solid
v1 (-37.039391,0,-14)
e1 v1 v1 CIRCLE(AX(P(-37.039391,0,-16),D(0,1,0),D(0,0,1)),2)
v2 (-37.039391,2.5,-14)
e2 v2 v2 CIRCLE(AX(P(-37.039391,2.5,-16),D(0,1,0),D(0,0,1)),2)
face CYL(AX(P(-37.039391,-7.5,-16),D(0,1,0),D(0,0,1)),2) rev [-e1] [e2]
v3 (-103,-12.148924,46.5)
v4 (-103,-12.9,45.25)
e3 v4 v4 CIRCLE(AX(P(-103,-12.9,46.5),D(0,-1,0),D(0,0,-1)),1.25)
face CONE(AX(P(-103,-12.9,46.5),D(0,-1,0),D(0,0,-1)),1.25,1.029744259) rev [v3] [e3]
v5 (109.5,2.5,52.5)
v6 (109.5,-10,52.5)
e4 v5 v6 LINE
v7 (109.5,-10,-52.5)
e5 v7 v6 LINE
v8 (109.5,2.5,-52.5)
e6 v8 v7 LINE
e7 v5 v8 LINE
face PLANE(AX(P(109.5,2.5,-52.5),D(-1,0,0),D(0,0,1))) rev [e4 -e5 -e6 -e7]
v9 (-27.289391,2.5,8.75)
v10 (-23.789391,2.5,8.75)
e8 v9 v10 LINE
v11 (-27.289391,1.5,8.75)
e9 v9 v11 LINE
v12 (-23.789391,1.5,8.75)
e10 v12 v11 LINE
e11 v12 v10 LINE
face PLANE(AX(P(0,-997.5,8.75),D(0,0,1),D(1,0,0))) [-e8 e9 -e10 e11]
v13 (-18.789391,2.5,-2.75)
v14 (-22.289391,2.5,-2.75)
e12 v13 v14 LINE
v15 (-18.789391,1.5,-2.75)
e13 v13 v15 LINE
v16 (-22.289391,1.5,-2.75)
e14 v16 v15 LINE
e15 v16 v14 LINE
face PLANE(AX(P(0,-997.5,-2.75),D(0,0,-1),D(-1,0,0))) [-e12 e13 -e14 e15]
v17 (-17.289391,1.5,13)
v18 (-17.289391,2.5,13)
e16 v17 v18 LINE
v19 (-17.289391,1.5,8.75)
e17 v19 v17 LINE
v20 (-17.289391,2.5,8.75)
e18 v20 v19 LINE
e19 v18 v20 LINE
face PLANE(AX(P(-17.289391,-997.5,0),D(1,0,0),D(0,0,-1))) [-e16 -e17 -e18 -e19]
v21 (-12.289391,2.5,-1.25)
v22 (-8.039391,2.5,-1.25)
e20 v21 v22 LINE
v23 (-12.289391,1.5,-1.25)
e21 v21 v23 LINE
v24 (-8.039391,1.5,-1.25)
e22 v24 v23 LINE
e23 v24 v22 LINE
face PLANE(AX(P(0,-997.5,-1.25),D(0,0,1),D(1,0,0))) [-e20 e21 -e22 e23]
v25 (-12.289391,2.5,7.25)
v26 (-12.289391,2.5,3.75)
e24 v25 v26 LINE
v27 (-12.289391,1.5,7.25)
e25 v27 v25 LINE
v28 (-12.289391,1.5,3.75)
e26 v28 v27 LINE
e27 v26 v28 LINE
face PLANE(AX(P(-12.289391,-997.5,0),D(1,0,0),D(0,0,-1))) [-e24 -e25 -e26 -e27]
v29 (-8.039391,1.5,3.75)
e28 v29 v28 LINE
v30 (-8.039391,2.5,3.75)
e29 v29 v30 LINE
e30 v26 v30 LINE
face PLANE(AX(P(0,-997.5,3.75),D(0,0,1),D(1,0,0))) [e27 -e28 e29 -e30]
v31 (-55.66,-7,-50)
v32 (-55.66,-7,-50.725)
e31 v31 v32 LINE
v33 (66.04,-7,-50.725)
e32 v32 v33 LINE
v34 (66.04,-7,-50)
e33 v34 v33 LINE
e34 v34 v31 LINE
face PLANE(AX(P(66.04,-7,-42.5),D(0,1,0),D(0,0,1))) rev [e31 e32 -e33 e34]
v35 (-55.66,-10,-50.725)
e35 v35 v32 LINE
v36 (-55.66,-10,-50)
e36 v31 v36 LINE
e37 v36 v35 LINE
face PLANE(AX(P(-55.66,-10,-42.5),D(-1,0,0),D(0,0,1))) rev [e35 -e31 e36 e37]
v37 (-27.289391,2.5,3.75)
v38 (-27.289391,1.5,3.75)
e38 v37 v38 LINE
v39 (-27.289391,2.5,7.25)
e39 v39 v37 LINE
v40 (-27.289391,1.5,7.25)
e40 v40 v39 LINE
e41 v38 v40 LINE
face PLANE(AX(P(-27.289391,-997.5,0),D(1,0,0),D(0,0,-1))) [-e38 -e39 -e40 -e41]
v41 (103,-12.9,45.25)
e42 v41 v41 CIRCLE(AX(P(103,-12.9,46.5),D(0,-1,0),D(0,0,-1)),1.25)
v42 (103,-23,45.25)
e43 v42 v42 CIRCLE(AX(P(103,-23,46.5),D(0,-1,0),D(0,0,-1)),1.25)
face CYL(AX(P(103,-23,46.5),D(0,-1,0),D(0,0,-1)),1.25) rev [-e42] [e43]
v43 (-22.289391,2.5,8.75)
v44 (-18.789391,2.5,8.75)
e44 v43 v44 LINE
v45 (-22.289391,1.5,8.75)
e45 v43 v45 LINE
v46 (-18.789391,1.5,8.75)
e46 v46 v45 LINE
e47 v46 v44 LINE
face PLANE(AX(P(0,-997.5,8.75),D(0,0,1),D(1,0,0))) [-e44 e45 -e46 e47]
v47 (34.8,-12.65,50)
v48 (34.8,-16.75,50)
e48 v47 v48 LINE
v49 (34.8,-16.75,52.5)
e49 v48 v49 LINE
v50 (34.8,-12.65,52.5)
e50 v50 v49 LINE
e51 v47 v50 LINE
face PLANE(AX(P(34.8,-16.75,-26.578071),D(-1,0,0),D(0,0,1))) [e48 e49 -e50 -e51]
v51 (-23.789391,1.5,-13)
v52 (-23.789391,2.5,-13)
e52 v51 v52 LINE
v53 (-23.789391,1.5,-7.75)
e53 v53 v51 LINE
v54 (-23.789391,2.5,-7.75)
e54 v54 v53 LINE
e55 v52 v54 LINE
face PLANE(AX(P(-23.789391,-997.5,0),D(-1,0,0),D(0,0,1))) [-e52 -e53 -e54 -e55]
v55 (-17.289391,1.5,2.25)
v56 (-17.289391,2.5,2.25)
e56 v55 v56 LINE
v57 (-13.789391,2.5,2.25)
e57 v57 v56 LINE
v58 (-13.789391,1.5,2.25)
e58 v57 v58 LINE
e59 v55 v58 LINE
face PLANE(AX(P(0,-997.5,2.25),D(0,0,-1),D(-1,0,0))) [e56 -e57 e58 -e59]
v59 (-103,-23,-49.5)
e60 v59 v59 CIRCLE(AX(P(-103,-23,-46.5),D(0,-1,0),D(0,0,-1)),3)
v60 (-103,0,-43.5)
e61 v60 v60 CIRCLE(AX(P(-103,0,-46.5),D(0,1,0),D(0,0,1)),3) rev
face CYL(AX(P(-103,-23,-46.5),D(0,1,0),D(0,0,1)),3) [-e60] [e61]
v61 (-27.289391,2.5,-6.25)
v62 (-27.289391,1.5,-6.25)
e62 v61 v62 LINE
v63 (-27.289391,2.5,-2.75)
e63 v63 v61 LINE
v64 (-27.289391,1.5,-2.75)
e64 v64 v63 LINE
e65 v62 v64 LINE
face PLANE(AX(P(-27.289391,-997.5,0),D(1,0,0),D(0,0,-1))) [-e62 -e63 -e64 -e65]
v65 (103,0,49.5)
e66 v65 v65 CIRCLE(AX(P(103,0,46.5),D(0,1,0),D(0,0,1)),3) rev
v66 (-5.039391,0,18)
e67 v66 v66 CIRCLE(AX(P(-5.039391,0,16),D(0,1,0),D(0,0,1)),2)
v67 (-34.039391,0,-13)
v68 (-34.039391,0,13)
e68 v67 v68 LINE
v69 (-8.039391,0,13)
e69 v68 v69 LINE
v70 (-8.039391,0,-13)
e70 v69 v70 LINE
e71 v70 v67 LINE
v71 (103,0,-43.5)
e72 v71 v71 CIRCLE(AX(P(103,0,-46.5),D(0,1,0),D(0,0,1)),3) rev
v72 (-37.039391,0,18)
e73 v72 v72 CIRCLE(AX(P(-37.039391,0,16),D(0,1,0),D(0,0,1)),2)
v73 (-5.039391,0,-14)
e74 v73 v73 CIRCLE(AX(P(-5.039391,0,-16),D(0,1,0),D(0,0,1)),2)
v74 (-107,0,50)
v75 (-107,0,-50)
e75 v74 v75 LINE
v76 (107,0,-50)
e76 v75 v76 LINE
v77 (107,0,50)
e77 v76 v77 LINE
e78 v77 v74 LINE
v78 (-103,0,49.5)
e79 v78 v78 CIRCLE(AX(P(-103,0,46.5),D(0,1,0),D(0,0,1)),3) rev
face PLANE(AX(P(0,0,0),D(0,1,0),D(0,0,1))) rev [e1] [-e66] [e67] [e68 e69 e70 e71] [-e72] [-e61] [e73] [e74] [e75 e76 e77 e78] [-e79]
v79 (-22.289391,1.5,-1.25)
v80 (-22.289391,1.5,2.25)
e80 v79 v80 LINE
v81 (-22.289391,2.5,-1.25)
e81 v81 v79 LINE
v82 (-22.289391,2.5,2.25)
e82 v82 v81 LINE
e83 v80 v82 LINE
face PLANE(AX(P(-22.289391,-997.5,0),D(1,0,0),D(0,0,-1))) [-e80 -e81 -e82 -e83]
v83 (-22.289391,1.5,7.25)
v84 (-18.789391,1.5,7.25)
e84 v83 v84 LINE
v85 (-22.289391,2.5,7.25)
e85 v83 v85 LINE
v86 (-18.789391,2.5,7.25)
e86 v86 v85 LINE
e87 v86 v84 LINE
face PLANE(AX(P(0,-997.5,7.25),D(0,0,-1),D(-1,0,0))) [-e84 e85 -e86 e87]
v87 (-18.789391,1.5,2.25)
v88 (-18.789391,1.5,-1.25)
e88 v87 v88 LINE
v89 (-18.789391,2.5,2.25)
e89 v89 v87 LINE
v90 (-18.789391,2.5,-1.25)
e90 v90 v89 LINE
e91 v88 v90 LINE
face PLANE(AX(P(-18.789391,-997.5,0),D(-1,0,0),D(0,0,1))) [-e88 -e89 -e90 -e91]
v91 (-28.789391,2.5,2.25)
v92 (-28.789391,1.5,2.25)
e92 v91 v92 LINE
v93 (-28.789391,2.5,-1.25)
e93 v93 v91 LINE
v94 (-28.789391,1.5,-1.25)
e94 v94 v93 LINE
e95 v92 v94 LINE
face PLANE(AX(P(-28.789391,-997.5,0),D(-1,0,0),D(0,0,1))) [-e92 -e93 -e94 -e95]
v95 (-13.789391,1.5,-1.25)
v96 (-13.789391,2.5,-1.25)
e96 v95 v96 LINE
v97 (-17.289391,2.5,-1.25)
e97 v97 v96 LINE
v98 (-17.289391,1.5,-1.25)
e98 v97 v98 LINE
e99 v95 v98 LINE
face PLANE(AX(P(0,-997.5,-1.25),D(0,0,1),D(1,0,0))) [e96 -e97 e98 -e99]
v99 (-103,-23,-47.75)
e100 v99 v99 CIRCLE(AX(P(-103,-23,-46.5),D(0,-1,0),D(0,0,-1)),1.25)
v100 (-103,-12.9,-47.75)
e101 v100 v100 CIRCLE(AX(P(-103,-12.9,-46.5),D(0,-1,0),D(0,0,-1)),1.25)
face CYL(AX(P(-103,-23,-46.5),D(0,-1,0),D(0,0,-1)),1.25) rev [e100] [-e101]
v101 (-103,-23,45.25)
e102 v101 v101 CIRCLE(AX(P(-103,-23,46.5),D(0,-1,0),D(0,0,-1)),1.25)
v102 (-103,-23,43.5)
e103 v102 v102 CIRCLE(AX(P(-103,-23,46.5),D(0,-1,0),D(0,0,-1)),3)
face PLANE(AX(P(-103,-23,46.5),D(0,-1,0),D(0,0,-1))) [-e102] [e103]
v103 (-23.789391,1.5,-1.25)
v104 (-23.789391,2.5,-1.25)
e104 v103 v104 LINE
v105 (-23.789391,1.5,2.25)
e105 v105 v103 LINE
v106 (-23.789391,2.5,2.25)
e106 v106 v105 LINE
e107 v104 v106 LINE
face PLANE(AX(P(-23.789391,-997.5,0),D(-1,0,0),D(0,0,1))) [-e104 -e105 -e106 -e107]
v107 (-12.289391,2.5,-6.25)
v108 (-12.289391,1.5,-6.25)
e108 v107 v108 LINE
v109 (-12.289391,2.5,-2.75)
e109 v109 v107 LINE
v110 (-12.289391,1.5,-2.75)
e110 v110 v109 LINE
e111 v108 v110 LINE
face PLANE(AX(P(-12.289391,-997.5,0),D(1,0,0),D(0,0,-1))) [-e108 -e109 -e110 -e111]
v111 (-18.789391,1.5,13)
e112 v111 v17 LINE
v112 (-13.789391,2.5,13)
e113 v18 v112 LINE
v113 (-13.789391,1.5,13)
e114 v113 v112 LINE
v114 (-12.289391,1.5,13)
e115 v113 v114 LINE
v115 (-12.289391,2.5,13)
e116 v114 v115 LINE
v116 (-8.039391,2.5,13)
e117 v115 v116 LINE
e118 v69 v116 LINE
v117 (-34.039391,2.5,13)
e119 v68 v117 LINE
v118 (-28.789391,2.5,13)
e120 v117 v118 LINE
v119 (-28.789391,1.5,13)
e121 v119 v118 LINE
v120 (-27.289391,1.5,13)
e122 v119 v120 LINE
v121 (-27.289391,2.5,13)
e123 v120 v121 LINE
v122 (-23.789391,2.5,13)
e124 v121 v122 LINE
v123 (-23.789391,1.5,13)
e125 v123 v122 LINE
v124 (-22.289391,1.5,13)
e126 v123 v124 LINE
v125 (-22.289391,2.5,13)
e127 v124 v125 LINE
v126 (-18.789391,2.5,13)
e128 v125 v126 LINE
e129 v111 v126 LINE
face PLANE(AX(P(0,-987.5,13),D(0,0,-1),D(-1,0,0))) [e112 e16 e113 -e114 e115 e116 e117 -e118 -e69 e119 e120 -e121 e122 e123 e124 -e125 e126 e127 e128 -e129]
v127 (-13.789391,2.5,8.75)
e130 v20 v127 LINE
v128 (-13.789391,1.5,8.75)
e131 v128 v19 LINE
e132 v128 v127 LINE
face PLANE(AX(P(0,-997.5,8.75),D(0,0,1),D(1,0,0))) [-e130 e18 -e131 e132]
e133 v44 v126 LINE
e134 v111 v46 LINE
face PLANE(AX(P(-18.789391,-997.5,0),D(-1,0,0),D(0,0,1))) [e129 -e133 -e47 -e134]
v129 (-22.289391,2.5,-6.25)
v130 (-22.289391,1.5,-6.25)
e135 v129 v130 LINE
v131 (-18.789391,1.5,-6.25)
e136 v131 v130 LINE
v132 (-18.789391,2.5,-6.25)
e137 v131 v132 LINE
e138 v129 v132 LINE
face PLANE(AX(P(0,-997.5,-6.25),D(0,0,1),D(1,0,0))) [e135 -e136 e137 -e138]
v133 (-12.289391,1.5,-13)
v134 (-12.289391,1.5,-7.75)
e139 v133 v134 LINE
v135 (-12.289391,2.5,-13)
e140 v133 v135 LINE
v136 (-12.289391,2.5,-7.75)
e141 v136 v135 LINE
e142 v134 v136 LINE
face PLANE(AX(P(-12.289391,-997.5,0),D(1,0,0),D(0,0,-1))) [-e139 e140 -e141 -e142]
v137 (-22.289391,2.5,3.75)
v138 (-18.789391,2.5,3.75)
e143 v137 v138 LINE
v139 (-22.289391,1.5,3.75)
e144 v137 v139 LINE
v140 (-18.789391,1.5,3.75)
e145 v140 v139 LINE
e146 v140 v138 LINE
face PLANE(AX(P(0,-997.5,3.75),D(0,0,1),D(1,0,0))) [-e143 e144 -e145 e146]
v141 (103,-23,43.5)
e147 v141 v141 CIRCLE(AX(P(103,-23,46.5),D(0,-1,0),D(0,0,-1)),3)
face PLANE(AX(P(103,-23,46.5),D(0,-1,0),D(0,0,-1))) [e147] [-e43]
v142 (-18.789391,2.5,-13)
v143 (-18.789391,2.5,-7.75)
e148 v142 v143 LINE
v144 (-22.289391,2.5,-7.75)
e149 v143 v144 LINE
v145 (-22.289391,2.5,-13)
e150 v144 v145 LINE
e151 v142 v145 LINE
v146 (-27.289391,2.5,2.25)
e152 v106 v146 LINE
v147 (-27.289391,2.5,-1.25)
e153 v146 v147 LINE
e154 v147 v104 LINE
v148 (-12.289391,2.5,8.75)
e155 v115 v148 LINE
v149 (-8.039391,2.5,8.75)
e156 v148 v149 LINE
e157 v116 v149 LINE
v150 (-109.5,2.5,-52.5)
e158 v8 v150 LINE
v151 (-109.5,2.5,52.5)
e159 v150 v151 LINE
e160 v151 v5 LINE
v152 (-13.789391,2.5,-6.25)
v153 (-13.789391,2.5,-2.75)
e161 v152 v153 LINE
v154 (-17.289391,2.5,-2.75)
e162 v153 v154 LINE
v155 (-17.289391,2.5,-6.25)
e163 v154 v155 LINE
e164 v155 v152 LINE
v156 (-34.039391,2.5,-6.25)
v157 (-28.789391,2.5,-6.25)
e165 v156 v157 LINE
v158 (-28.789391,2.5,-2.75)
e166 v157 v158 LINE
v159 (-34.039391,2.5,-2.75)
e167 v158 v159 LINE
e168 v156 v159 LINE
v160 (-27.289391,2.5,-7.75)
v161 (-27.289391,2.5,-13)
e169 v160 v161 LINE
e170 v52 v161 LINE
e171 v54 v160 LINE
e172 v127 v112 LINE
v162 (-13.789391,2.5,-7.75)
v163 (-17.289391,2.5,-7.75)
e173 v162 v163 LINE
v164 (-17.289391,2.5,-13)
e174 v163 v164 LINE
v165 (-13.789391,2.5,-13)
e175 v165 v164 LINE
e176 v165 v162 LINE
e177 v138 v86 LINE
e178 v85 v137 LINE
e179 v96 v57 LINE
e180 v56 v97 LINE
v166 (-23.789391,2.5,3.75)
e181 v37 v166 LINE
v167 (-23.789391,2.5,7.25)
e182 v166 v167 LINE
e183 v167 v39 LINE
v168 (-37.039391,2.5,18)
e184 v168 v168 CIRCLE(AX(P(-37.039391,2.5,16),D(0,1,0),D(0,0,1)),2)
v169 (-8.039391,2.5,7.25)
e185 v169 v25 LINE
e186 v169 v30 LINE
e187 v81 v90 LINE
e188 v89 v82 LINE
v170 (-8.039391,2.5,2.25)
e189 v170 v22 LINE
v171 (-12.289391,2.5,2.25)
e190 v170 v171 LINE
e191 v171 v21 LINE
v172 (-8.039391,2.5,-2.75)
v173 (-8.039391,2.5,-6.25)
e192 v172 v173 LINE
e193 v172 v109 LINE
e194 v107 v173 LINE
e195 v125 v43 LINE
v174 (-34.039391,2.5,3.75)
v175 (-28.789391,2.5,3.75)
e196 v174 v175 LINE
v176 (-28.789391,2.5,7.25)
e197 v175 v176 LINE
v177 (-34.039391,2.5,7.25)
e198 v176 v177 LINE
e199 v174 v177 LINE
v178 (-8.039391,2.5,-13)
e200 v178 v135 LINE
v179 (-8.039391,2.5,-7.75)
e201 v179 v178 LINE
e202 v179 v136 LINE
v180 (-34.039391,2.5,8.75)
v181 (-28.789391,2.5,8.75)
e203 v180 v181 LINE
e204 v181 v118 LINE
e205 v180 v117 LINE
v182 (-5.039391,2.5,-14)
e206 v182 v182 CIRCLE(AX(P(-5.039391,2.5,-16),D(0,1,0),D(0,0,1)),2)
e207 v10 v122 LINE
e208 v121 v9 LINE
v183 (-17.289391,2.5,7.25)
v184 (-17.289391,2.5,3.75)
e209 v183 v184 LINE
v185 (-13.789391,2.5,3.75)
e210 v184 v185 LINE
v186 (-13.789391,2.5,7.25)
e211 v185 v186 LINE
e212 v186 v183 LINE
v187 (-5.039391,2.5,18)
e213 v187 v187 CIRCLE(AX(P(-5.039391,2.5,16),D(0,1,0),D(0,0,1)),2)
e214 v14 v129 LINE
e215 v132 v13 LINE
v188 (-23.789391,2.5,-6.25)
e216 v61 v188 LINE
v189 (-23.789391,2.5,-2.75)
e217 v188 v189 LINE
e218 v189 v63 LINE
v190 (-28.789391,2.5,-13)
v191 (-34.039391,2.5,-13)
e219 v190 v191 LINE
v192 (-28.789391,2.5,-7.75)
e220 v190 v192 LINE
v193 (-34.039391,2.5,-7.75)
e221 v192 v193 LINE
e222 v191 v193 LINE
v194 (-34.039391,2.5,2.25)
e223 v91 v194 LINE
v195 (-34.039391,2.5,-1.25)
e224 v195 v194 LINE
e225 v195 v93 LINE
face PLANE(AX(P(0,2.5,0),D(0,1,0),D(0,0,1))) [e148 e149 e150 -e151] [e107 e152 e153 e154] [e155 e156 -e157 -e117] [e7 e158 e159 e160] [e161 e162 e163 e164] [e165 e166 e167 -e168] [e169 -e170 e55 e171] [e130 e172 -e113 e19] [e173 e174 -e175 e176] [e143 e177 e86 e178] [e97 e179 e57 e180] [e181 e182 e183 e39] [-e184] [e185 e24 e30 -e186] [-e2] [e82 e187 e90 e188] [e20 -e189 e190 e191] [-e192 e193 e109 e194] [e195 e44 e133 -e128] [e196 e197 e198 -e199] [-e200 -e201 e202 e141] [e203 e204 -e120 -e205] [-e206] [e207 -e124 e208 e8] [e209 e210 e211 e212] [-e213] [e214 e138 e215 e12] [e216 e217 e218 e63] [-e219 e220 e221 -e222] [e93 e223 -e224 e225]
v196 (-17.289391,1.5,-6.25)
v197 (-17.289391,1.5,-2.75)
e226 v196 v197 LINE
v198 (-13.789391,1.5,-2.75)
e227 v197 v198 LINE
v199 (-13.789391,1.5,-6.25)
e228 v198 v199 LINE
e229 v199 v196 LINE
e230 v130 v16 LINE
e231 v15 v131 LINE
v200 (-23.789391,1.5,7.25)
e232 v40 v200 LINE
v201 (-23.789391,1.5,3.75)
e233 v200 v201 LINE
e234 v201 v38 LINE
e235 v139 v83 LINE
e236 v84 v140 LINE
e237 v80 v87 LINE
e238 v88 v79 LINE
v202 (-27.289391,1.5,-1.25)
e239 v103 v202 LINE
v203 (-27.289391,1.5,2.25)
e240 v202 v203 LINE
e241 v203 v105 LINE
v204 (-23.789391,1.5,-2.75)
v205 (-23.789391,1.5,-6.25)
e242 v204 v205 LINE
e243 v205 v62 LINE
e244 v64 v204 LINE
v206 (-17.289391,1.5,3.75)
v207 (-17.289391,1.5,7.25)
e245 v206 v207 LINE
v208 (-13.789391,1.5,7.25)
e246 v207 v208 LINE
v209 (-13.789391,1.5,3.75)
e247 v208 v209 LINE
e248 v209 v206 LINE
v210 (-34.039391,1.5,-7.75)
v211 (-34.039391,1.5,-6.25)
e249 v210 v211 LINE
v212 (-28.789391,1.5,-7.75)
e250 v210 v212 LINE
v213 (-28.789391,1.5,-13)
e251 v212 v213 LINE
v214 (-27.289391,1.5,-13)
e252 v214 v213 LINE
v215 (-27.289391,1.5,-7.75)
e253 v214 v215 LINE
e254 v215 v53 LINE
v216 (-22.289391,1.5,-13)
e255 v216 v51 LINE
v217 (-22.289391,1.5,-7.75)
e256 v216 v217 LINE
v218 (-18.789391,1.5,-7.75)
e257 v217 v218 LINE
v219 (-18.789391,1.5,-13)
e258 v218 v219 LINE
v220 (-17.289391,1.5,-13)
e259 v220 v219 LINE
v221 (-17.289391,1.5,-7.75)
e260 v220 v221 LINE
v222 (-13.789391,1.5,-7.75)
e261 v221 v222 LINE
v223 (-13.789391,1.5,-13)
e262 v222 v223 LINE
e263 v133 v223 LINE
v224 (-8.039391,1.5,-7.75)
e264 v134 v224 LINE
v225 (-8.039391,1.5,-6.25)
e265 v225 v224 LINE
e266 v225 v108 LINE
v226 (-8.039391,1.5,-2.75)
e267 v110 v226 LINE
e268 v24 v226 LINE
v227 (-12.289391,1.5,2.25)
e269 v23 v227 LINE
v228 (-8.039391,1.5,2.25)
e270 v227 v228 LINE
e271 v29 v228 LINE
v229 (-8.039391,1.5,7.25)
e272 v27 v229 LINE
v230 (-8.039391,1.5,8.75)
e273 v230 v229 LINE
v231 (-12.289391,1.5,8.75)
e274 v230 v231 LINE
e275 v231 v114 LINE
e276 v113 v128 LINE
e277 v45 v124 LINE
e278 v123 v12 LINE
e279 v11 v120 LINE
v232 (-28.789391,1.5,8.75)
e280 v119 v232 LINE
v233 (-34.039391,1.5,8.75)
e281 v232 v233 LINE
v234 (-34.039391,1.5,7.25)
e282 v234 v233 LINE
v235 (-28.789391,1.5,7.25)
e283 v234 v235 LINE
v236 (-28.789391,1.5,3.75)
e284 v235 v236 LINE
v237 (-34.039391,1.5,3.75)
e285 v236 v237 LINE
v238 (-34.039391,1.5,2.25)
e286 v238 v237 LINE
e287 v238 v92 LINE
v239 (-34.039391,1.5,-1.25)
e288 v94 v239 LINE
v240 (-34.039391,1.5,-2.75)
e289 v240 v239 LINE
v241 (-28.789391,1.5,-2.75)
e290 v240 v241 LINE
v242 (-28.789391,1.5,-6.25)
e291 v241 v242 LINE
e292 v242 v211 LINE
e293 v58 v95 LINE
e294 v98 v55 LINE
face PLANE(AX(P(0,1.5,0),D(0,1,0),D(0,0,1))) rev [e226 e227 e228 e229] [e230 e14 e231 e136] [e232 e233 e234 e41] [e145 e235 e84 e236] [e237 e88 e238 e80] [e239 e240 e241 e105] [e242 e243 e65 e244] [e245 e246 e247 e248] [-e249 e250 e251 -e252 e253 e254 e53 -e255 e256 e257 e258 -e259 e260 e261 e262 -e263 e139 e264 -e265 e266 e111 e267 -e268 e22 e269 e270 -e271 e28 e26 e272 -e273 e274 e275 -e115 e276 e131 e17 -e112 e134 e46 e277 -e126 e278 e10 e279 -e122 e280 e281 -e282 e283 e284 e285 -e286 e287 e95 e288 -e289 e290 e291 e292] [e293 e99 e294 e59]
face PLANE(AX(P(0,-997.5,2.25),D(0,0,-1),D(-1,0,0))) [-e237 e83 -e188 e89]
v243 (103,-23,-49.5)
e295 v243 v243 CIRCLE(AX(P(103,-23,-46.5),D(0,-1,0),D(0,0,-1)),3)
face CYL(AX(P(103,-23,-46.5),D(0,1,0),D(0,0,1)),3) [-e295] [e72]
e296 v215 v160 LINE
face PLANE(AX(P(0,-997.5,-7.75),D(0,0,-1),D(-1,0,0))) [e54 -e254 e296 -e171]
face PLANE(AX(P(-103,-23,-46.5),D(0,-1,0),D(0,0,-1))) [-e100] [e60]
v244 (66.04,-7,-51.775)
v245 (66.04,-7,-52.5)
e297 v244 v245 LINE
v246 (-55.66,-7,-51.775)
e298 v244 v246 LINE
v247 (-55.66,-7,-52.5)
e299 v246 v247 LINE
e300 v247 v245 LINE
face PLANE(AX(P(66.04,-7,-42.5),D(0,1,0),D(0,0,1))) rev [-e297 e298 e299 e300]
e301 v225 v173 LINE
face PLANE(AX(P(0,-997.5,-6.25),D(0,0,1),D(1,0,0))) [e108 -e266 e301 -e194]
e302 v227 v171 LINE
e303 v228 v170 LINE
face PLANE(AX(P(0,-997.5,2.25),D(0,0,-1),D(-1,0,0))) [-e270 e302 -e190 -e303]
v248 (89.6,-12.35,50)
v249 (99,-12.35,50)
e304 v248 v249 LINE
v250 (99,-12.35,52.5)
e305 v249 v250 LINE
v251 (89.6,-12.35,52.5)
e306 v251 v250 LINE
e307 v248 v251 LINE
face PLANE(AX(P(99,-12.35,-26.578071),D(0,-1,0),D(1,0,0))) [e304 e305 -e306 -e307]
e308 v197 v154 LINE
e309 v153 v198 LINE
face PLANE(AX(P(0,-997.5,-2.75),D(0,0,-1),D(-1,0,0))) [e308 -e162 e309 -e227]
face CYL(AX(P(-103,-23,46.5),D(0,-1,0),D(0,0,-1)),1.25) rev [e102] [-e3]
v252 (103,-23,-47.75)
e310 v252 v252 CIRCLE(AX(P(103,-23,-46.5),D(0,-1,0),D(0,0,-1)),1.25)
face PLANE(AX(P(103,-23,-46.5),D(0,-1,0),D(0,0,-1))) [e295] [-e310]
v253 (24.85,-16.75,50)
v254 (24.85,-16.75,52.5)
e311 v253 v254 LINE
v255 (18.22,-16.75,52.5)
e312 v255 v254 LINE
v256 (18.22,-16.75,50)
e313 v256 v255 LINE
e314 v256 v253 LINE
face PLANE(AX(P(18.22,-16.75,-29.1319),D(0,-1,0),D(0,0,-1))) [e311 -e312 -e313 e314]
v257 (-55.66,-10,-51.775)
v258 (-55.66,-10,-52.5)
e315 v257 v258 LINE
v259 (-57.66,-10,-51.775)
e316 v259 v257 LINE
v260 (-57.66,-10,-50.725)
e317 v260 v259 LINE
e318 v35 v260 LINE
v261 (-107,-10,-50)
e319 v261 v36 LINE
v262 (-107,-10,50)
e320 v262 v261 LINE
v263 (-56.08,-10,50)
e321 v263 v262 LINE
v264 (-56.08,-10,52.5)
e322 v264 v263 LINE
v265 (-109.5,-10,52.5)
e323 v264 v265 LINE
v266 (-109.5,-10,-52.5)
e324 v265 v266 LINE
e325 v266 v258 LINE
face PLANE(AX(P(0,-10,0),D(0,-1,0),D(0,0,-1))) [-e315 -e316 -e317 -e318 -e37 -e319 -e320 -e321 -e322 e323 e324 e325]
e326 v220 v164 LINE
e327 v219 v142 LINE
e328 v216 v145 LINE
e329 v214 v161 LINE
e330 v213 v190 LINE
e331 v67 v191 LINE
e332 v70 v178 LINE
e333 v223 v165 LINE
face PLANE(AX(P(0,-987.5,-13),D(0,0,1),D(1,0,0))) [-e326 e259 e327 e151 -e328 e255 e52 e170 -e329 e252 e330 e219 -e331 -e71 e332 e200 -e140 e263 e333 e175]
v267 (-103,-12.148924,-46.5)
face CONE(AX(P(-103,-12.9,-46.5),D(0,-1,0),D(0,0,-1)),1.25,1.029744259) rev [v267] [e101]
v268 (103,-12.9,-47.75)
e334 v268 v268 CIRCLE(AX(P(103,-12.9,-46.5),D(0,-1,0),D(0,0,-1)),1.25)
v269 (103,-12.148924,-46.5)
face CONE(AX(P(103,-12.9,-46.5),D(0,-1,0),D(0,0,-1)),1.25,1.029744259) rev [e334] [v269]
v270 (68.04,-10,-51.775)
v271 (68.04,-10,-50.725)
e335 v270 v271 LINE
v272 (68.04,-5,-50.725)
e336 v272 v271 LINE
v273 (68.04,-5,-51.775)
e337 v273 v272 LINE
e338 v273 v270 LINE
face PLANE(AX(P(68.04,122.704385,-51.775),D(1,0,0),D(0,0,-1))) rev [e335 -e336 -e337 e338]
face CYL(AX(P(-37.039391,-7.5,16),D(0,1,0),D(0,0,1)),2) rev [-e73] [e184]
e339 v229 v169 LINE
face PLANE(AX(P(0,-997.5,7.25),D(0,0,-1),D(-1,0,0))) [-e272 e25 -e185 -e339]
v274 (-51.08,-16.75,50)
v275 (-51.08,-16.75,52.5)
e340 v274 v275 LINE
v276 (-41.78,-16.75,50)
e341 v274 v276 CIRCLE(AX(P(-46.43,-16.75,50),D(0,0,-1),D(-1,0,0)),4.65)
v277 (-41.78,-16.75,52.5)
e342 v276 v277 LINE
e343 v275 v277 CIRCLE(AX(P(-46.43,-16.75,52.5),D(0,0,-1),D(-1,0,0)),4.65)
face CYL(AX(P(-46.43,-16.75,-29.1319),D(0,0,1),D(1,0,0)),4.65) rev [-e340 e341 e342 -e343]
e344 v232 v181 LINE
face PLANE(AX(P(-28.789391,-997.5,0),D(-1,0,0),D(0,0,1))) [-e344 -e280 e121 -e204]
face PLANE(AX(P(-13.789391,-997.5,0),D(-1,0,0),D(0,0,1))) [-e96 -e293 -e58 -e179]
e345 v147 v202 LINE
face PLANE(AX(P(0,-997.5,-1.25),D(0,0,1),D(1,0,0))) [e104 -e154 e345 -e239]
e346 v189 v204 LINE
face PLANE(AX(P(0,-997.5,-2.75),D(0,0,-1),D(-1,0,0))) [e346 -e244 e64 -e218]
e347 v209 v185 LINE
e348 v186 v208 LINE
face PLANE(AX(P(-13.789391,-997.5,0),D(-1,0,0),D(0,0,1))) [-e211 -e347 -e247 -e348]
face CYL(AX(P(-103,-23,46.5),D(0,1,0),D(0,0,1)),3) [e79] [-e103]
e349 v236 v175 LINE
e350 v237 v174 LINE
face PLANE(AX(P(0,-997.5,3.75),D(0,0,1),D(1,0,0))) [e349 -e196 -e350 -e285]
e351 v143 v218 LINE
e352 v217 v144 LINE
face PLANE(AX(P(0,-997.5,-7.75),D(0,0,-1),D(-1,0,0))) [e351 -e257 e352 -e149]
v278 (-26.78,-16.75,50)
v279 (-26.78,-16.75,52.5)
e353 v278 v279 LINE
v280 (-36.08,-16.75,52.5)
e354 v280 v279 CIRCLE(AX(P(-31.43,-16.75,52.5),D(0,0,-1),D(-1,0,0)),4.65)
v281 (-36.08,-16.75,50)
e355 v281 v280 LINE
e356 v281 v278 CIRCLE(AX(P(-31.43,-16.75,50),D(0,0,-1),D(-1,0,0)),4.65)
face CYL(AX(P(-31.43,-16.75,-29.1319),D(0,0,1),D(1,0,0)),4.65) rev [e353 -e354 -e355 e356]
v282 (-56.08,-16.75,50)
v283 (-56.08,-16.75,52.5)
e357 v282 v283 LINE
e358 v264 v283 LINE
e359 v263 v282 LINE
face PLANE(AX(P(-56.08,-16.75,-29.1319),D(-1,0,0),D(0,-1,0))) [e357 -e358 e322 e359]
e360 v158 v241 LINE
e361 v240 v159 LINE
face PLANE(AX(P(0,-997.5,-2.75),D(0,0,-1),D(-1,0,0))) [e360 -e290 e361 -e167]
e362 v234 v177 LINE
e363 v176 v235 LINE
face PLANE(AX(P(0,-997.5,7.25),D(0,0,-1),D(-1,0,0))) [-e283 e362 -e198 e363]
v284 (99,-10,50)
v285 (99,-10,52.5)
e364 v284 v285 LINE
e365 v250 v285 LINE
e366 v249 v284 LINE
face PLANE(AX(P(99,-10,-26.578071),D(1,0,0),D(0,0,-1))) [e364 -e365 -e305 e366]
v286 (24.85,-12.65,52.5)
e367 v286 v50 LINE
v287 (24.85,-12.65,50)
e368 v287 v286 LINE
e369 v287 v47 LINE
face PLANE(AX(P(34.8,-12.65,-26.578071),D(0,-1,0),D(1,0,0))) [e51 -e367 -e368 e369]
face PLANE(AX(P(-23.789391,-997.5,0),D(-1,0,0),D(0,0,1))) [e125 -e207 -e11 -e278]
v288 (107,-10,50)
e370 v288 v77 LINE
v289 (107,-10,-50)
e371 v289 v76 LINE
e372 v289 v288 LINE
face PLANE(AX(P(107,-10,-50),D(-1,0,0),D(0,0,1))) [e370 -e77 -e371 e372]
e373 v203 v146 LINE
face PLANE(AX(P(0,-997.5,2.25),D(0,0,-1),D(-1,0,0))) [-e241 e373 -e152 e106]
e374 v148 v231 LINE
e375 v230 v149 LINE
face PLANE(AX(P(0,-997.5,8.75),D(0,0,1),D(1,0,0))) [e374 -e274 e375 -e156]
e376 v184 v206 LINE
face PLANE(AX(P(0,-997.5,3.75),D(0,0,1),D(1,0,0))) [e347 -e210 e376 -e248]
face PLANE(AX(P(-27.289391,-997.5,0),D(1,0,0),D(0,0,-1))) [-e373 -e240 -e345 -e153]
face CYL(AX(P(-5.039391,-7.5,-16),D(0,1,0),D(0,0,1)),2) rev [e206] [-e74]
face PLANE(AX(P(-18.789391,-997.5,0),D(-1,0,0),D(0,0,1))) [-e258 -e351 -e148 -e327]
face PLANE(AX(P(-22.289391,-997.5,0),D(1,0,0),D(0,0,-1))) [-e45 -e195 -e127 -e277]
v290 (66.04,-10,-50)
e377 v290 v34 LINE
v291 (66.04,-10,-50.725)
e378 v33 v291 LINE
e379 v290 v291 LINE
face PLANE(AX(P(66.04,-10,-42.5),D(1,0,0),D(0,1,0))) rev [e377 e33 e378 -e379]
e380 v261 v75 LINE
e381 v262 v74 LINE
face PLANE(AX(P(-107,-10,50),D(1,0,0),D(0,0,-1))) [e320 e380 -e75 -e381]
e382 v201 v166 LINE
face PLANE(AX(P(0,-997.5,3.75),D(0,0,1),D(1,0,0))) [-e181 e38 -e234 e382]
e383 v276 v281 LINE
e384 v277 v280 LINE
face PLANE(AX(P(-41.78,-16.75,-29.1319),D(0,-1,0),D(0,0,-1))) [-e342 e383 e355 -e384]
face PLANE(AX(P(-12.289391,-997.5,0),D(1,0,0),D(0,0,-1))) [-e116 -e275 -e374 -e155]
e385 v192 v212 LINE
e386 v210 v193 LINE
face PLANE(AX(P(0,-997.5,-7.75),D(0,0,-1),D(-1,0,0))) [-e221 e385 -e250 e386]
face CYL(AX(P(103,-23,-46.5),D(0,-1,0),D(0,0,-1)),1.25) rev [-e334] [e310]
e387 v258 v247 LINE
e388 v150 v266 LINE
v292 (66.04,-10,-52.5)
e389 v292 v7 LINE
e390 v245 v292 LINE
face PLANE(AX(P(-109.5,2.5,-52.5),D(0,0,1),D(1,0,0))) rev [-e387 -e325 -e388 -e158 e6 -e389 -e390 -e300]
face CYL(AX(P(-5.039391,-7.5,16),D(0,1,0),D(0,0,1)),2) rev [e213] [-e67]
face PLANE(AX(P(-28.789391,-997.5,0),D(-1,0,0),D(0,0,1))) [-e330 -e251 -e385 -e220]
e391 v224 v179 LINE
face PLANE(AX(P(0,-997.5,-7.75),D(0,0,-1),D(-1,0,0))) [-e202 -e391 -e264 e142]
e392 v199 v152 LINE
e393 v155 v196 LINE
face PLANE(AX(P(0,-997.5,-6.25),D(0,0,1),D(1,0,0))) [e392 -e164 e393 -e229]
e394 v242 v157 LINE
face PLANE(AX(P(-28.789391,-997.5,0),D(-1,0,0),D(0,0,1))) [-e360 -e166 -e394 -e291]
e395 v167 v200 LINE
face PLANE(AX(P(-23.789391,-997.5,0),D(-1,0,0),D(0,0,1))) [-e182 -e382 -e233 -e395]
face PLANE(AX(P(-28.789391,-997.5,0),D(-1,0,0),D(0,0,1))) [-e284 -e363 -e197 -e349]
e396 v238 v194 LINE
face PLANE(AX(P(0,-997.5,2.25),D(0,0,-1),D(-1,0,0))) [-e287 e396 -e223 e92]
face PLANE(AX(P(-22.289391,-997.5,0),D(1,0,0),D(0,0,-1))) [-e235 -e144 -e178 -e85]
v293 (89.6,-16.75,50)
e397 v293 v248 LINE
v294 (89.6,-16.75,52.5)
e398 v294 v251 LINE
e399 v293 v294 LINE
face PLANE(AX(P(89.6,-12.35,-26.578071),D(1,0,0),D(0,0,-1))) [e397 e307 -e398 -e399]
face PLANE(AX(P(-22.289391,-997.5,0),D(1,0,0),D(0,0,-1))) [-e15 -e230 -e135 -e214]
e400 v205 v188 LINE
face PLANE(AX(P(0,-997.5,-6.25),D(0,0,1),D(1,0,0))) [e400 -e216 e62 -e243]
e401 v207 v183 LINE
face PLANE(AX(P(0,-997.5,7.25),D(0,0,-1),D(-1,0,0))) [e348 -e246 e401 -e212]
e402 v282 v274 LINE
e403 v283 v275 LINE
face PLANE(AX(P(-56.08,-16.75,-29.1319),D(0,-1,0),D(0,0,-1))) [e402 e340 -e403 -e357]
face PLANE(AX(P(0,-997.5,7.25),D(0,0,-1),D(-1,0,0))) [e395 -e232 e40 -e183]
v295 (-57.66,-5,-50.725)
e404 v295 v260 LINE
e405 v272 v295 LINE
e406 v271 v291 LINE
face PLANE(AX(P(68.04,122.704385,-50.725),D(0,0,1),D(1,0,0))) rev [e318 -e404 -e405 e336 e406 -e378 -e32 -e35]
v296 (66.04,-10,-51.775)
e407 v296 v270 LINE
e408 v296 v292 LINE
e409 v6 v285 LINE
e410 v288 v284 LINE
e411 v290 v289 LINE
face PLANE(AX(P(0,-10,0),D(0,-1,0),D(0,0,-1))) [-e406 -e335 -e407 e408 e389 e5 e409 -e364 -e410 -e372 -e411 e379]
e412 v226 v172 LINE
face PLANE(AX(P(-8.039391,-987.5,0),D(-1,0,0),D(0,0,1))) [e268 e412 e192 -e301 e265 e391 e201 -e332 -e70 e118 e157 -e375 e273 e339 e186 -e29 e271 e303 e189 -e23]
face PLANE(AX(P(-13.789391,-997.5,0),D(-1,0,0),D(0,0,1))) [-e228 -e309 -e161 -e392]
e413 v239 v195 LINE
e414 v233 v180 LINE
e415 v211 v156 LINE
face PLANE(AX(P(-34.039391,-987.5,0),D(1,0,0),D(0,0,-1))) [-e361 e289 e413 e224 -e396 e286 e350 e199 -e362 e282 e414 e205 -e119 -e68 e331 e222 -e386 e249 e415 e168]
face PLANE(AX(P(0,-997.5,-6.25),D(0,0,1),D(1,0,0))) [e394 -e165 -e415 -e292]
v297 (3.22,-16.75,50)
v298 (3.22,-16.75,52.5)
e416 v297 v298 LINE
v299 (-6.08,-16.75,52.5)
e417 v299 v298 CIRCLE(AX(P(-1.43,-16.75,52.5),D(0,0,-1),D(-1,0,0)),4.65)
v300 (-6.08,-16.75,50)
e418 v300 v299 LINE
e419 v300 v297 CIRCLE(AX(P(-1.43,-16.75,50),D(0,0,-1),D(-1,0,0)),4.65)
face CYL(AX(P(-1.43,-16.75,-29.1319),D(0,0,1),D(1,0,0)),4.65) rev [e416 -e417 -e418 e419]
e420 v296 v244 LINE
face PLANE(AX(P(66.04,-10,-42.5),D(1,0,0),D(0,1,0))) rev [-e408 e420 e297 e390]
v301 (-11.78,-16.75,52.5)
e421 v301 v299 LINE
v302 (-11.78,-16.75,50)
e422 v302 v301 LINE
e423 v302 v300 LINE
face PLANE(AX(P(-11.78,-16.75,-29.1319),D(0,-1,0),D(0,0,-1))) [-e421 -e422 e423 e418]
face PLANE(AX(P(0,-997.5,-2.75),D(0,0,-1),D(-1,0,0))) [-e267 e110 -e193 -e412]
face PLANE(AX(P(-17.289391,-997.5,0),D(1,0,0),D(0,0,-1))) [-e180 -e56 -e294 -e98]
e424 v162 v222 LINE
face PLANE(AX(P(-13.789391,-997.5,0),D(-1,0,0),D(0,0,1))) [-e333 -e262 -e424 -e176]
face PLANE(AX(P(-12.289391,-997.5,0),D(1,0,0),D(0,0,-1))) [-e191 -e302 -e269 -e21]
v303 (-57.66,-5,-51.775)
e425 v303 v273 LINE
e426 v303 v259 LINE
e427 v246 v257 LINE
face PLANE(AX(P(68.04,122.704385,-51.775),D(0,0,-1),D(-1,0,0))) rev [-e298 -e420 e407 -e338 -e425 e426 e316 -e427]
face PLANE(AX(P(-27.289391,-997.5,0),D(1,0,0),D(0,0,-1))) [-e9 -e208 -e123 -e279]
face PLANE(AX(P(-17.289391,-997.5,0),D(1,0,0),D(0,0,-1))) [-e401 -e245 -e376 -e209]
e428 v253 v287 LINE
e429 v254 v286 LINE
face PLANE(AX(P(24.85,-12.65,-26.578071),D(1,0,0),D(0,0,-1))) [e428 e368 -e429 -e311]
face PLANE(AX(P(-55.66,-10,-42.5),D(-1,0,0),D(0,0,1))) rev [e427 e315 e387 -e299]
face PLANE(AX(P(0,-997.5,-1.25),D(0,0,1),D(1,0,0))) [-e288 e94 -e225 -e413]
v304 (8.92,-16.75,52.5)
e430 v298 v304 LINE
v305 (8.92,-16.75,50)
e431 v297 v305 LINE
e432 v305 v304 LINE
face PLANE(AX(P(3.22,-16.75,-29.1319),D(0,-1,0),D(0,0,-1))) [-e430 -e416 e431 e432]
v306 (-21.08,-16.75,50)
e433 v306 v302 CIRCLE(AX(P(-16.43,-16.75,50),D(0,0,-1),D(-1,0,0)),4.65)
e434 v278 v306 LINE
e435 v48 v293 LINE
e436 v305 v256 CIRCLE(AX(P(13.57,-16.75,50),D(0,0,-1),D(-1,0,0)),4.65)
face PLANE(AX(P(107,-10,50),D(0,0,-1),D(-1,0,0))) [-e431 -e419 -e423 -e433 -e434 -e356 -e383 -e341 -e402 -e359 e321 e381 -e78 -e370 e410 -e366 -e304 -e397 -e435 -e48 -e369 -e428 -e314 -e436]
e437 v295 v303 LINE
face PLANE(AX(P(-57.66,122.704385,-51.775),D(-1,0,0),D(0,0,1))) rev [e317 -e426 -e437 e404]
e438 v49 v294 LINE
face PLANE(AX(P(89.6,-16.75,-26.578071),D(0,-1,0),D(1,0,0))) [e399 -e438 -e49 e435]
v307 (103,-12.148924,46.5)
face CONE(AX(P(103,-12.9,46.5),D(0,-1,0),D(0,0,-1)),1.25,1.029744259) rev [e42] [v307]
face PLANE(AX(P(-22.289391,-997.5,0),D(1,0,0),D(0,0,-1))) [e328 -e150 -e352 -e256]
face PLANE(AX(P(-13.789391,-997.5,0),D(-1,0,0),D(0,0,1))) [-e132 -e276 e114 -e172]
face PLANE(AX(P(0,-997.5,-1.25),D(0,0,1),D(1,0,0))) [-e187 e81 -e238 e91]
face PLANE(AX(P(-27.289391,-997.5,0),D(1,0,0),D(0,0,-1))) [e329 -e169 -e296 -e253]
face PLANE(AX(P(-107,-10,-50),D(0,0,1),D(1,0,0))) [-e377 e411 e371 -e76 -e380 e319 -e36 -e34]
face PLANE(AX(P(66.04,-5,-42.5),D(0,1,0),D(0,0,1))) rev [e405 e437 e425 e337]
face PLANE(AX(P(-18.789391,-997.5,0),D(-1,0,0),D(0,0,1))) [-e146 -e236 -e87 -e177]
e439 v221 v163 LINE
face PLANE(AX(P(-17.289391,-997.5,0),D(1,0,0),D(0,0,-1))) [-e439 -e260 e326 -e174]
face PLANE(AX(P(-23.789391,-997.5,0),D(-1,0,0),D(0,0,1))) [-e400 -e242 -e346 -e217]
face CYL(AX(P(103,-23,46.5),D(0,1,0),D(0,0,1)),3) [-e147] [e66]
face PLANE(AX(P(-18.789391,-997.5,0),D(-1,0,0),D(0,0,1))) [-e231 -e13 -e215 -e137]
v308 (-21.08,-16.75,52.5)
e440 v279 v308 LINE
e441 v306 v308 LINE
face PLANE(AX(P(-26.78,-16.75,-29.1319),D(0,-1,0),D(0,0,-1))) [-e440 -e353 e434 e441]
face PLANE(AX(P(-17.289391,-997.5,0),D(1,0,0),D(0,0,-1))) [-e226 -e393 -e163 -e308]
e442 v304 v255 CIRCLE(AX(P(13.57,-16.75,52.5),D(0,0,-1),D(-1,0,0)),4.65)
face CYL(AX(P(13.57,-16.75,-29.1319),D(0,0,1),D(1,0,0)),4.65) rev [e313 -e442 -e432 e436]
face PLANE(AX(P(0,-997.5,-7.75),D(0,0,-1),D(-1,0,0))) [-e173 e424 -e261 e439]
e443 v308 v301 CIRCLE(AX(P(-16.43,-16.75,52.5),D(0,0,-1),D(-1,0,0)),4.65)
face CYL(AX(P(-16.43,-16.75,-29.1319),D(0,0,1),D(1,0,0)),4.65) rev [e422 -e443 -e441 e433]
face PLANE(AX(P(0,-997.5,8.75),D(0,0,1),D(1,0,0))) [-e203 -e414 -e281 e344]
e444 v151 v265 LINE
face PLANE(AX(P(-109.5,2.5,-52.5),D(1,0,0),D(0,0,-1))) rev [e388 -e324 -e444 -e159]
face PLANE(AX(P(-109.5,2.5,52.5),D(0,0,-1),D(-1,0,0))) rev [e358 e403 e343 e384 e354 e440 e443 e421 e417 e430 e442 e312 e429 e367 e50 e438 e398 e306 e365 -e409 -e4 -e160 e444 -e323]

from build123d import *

# Parameters (mm, degrees)
SKETCH2_W             = 219
SKETCH2_H             = 105
BOSS_EXTRUDE1_DEPTH   = 2.5
SKETCH3_W             = 219
SKETCH3_H             = 105
SKETCH3_W_2           = 214
SKETCH3_H_2           = 100
BOSS_EXTRUDE2_DEPTH   = 10
SKETCH5_R             = 3
BOSS_EXTRUDE3_DEPTH   = 23
M3_TAPPED_HOLE1_D     = 2.5
M3_TAPPED_HOLE1_DEPTH = 10.1
M3_TAPPED_HOLE1_TIP   = 0.751075774
SKETCH8_R             = 2
CUT_EXTRUDE1_DEPTH    = 10
VENT1_START           = -34.039390763
VENT1_OUTLINE_W       = 1.5
VENT1_OUTLINE_H       = 26
VENT1_DEPTH           = 26
VENT1_2_OUTLINE_W     = 1
VENT1_2_OUTLINE_H     = 4.25
VENT1_2_OUTLINE_H_2   = 5.25
VENT1_2_OUTLINE_H_3   = 3.5
VENT1_2_DEPTH         = 5.25
VENT1_START_2         = -12.289390763
VENT1_3_OUTLINE_W     = 1
VENT1_3_OUTLINE_H     = 4.25
VENT1_3_OUTLINE_H_2   = 5.25
VENT1_3_OUTLINE_H_3   = 3.5
VENT1_3_DEPTH         = 4.25
VENT1_START_3         = -27.289390763
VENT1_4_OUTLINE_W     = 1
VENT1_4_OUTLINE_H     = 4.25
VENT1_4_OUTLINE_H_2   = 5.25
VENT1_4_OUTLINE_H_3   = 3.5
VENT1_4_DEPTH         = 3.5
VENT1_START_4         = -22.289390763
VENT1_5_OUTLINE_W     = 1
VENT1_5_OUTLINE_H     = 4.25
VENT1_5_OUTLINE_H_2   = 5.25
VENT1_5_OUTLINE_H_3   = 3.5
VENT1_5_DEPTH         = 3.5
VENT1_START_5         = -17.289390763
VENT1_6_OUTLINE_W     = 1
VENT1_6_OUTLINE_H     = 4.25
VENT1_6_OUTLINE_H_2   = 5.25
VENT1_6_OUTLINE_H_3   = 3.5
VENT1_6_DEPTH         = 3.5
BOSS_EXTRUDE4_DEPTH   = 2.5
BOSS_EXTRUDE5_DEPTH   = 2.5
SKETCH13_W            = 121.7
SKETCH13_H            = 3
CUT_EXTRUDE2_DEPTH    = 10
SKETCH14_W            = 125.7
SKETCH14_H            = 1.05
CUT_EXTRUDE3_DEPTH    = 5


# Read off the part's stored shape, not the designer's step: Vent1
with BuildPart() as part:
    # Sketch2 → Boss-Extrude1 (new body)
    with BuildSketch(Plane(origin=(0, 0, 0), x_dir=(1, 0, 0), z_dir=(0, 1, 0))):
        Rectangle(SKETCH2_W, SKETCH2_H)
    extrude(amount=BOSS_EXTRUDE1_DEPTH)

    # Sketch3 → Boss-Extrude2 (add)
    with BuildSketch(Plane.XZ):
        Rectangle(SKETCH3_W, SKETCH3_H)
        Rectangle(SKETCH3_W_2, SKETCH3_H_2, mode=Mode.SUBTRACT)
    extrude(amount=BOSS_EXTRUDE2_DEPTH)

    # Sketch5 → Boss-Extrude3 (add)
    with BuildSketch(Plane.XZ):
        with Locations(Location((103, -46.5, 0), (0, 0, 90))):
            Circle(SKETCH5_R)
        with Locations(Location((-103, -46.5, 0), (0, 0, 90))):
            Circle(SKETCH5_R)
        with Locations(Location((-103, 46.5, 0), (0, 0, 90))):
            Circle(SKETCH5_R)
        with Locations(Location((103, 46.5, 0), (0, 0, 90))):
            Circle(SKETCH5_R)
    extrude(amount=BOSS_EXTRUDE3_DEPTH)

    # M3 Tapped Hole1
    with Locations(Plane(origin=(0, -23, 0), x_dir=(-1, 0, 0), z_dir=(0, -1, 0))):
        with Locations((-103, 46.5), (103, 46.5), (103, -46.5), (-103, -46.5)):
            Hole(M3_TAPPED_HOLE1_D / 2, depth=M3_TAPPED_HOLE1_DEPTH)
            with Locations((0, 0, -(M3_TAPPED_HOLE1_DEPTH + M3_TAPPED_HOLE1_TIP / 2))):  # 118° drill point
                Cone(0, M3_TAPPED_HOLE1_D / 2, M3_TAPPED_HOLE1_TIP, mode=Mode.SUBTRACT)

    # Sketch8 → Cut-Extrude1 (cut)
    with BuildSketch(Plane(origin=(0, 2.5, 0), x_dir=(1, 0, 0), z_dir=(0, 1, 0))):
        with Locations(Location((-5.039390763, -16, 0), (0, 0, 270))):
            Circle(SKETCH8_R)
        with Locations(Location((-37.039390763, -16, 0), (0, 0, 270))):
            Circle(SKETCH8_R)
        with Locations(Location((-37.039390763, 16, 0), (0, 0, 270))):
            Circle(SKETCH8_R)
        with Locations(Location((-5.039390763, 16, 0), (0, 0, 270))):
            Circle(SKETCH8_R)
    extrude(amount=-CUT_EXTRUDE1_DEPTH, mode=Mode.SUBTRACT)

    # Vent1 outline → Vent1 (cut)
    with BuildSketch(Plane.YZ.offset(VENT1_START)):
        with Locations((0.75, 0)):
            Rectangle(VENT1_OUTLINE_W, VENT1_OUTLINE_H)
    extrude(amount=VENT1_DEPTH, mode=Mode.SUBTRACT)

    # Vent1 2 outline → Vent1 2 (cut)
    with BuildSketch(Plane.YZ.offset(VENT1_START)):
        with Locations((2, 10.875)):
            Rectangle(VENT1_2_OUTLINE_W, VENT1_2_OUTLINE_H)
        with Locations((2, -10.375)):
            Rectangle(VENT1_2_OUTLINE_W, VENT1_2_OUTLINE_H_2)
        with Locations((2, 5.5)):
            Rectangle(VENT1_2_OUTLINE_W, VENT1_2_OUTLINE_H_3)
        with Locations((2, -4.5)):
            Rectangle(VENT1_2_OUTLINE_W, VENT1_2_OUTLINE_H_3)
        with Locations((2, 0.5)):
            Rectangle(VENT1_2_OUTLINE_W, VENT1_2_OUTLINE_H_3)
    extrude(amount=VENT1_2_DEPTH, mode=Mode.SUBTRACT)

    # Vent1 3 outline → Vent1 3 (cut)
    with BuildSketch(Plane.YZ.offset(VENT1_START_2)):
        with Locations((2, 10.875)):
            Rectangle(VENT1_3_OUTLINE_W, VENT1_3_OUTLINE_H)
        with Locations((2, -10.375)):
            Rectangle(VENT1_3_OUTLINE_W, VENT1_3_OUTLINE_H_2)
        with Locations((2, 5.5)):
            Rectangle(VENT1_3_OUTLINE_W, VENT1_3_OUTLINE_H_3)
        with Locations((2, -4.5)):
            Rectangle(VENT1_3_OUTLINE_W, VENT1_3_OUTLINE_H_3)
        with Locations((2, 0.5)):
            Rectangle(VENT1_3_OUTLINE_W, VENT1_3_OUTLINE_H_3)
    extrude(amount=VENT1_3_DEPTH, mode=Mode.SUBTRACT)

    # Vent1 4 outline → Vent1 4 (cut)
    with BuildSketch(Plane.YZ.offset(VENT1_START_3)):
        with Locations((2, 10.875)):
            Rectangle(VENT1_4_OUTLINE_W, VENT1_4_OUTLINE_H)
        with Locations((2, -10.375)):
            Rectangle(VENT1_4_OUTLINE_W, VENT1_4_OUTLINE_H_2)
        with Locations((2, 5.5)):
            Rectangle(VENT1_4_OUTLINE_W, VENT1_4_OUTLINE_H_3)
        with Locations((2, -4.5)):
            Rectangle(VENT1_4_OUTLINE_W, VENT1_4_OUTLINE_H_3)
        with Locations((2, 0.5)):
            Rectangle(VENT1_4_OUTLINE_W, VENT1_4_OUTLINE_H_3)
    extrude(amount=VENT1_4_DEPTH, mode=Mode.SUBTRACT)

    # Vent1 5 outline → Vent1 5 (cut)
    with BuildSketch(Plane.YZ.offset(VENT1_START_4)):
        with Locations((2, 10.875)):
            Rectangle(VENT1_5_OUTLINE_W, VENT1_5_OUTLINE_H)
        with Locations((2, -10.375)):
            Rectangle(VENT1_5_OUTLINE_W, VENT1_5_OUTLINE_H_2)
        with Locations((2, 5.5)):
            Rectangle(VENT1_5_OUTLINE_W, VENT1_5_OUTLINE_H_3)
        with Locations((2, -4.5)):
            Rectangle(VENT1_5_OUTLINE_W, VENT1_5_OUTLINE_H_3)
        with Locations((2, 0.5)):
            Rectangle(VENT1_5_OUTLINE_W, VENT1_5_OUTLINE_H_3)
    extrude(amount=VENT1_5_DEPTH, mode=Mode.SUBTRACT)

    # Vent1 6 outline → Vent1 6 (cut)
    with BuildSketch(Plane.YZ.offset(VENT1_START_5)):
        with Locations((2, 10.875)):
            Rectangle(VENT1_6_OUTLINE_W, VENT1_6_OUTLINE_H)
        with Locations((2, -10.375)):
            Rectangle(VENT1_6_OUTLINE_W, VENT1_6_OUTLINE_H_2)
        with Locations((2, 5.5)):
            Rectangle(VENT1_6_OUTLINE_W, VENT1_6_OUTLINE_H_3)
        with Locations((2, -4.5)):
            Rectangle(VENT1_6_OUTLINE_W, VENT1_6_OUTLINE_H_3)
        with Locations((2, 0.5)):
            Rectangle(VENT1_6_OUTLINE_W, VENT1_6_OUTLINE_H_3)
    extrude(amount=VENT1_6_DEPTH, mode=Mode.SUBTRACT)

    # Sketch10 → Boss-Extrude4 (add)
    with BuildSketch(Plane.XY.offset(52.5)):
        with BuildLine():
            Line((18.22, -16.75), (22.72, -16.75))
            Line((22.72, -16.75), (22.72, -9.51))
            Line((22.72, -9.51), (-56.08, -9.51))
            Line((-56.08, -9.51), (-56.08, -16.75))
            Line((-56.08, -16.75), (-51.08, -16.75))
            ThreePointArc((-51.08, -16.75), (-46.43, -12.1), (-41.78, -16.75))
            Line((-41.78, -16.75), (-36.08, -16.75))
            ThreePointArc((-36.08, -16.75), (-31.43, -12.1), (-26.78, -16.75))
            Line((-26.78, -16.75), (-21.08, -16.75))
            ThreePointArc((-21.08, -16.75), (-16.43, -12.1), (-11.78, -16.75))
            Line((-11.78, -16.75), (-6.08, -16.75))
            ThreePointArc((-6.08, -16.75), (-1.43, -12.1), (3.22, -16.75))
            Line((3.22, -16.75), (8.92, -16.75))
            ThreePointArc((8.92, -16.75), (13.57, -12.1), (18.22, -16.75))
        make_face()
    extrude(amount=-BOSS_EXTRUDE4_DEPTH)

    # Sketch12 → Boss-Extrude5 (add)
    with BuildSketch(Plane.XY.offset(52.5)):
        Polygon((99, -10), (99, -12.35), (89.6, -12.35), (89.6, -16.75), (34.8, -16.75), (34.8, -12.65), (24.85, -12.65), (24.85, -16.75), (22.72, -16.75), (22.72, -10), align=None)
    extrude(amount=-BOSS_EXTRUDE5_DEPTH)

    # Sketch13 → Cut-Extrude2 (cut)
    with BuildSketch(Plane(origin=(0, 0, -52.5), x_dir=(-1, 0, 0), z_dir=(0, 0, -1))):
        with Locations((-5.19, -8.5)):
            Rectangle(SKETCH13_W, SKETCH13_H)
    extrude(amount=-CUT_EXTRUDE2_DEPTH, mode=Mode.SUBTRACT)

    # Sketch14 → Cut-Extrude3 (cut)
    with BuildSketch(Plane.XZ.offset(10)):
        with Locations((5.19, -51.25)):
            Rectangle(SKETCH14_W, SKETCH14_H)
    extrude(amount=-CUT_EXTRUDE3_DEPTH, mode=Mode.SUBTRACT)


solid = part.part
